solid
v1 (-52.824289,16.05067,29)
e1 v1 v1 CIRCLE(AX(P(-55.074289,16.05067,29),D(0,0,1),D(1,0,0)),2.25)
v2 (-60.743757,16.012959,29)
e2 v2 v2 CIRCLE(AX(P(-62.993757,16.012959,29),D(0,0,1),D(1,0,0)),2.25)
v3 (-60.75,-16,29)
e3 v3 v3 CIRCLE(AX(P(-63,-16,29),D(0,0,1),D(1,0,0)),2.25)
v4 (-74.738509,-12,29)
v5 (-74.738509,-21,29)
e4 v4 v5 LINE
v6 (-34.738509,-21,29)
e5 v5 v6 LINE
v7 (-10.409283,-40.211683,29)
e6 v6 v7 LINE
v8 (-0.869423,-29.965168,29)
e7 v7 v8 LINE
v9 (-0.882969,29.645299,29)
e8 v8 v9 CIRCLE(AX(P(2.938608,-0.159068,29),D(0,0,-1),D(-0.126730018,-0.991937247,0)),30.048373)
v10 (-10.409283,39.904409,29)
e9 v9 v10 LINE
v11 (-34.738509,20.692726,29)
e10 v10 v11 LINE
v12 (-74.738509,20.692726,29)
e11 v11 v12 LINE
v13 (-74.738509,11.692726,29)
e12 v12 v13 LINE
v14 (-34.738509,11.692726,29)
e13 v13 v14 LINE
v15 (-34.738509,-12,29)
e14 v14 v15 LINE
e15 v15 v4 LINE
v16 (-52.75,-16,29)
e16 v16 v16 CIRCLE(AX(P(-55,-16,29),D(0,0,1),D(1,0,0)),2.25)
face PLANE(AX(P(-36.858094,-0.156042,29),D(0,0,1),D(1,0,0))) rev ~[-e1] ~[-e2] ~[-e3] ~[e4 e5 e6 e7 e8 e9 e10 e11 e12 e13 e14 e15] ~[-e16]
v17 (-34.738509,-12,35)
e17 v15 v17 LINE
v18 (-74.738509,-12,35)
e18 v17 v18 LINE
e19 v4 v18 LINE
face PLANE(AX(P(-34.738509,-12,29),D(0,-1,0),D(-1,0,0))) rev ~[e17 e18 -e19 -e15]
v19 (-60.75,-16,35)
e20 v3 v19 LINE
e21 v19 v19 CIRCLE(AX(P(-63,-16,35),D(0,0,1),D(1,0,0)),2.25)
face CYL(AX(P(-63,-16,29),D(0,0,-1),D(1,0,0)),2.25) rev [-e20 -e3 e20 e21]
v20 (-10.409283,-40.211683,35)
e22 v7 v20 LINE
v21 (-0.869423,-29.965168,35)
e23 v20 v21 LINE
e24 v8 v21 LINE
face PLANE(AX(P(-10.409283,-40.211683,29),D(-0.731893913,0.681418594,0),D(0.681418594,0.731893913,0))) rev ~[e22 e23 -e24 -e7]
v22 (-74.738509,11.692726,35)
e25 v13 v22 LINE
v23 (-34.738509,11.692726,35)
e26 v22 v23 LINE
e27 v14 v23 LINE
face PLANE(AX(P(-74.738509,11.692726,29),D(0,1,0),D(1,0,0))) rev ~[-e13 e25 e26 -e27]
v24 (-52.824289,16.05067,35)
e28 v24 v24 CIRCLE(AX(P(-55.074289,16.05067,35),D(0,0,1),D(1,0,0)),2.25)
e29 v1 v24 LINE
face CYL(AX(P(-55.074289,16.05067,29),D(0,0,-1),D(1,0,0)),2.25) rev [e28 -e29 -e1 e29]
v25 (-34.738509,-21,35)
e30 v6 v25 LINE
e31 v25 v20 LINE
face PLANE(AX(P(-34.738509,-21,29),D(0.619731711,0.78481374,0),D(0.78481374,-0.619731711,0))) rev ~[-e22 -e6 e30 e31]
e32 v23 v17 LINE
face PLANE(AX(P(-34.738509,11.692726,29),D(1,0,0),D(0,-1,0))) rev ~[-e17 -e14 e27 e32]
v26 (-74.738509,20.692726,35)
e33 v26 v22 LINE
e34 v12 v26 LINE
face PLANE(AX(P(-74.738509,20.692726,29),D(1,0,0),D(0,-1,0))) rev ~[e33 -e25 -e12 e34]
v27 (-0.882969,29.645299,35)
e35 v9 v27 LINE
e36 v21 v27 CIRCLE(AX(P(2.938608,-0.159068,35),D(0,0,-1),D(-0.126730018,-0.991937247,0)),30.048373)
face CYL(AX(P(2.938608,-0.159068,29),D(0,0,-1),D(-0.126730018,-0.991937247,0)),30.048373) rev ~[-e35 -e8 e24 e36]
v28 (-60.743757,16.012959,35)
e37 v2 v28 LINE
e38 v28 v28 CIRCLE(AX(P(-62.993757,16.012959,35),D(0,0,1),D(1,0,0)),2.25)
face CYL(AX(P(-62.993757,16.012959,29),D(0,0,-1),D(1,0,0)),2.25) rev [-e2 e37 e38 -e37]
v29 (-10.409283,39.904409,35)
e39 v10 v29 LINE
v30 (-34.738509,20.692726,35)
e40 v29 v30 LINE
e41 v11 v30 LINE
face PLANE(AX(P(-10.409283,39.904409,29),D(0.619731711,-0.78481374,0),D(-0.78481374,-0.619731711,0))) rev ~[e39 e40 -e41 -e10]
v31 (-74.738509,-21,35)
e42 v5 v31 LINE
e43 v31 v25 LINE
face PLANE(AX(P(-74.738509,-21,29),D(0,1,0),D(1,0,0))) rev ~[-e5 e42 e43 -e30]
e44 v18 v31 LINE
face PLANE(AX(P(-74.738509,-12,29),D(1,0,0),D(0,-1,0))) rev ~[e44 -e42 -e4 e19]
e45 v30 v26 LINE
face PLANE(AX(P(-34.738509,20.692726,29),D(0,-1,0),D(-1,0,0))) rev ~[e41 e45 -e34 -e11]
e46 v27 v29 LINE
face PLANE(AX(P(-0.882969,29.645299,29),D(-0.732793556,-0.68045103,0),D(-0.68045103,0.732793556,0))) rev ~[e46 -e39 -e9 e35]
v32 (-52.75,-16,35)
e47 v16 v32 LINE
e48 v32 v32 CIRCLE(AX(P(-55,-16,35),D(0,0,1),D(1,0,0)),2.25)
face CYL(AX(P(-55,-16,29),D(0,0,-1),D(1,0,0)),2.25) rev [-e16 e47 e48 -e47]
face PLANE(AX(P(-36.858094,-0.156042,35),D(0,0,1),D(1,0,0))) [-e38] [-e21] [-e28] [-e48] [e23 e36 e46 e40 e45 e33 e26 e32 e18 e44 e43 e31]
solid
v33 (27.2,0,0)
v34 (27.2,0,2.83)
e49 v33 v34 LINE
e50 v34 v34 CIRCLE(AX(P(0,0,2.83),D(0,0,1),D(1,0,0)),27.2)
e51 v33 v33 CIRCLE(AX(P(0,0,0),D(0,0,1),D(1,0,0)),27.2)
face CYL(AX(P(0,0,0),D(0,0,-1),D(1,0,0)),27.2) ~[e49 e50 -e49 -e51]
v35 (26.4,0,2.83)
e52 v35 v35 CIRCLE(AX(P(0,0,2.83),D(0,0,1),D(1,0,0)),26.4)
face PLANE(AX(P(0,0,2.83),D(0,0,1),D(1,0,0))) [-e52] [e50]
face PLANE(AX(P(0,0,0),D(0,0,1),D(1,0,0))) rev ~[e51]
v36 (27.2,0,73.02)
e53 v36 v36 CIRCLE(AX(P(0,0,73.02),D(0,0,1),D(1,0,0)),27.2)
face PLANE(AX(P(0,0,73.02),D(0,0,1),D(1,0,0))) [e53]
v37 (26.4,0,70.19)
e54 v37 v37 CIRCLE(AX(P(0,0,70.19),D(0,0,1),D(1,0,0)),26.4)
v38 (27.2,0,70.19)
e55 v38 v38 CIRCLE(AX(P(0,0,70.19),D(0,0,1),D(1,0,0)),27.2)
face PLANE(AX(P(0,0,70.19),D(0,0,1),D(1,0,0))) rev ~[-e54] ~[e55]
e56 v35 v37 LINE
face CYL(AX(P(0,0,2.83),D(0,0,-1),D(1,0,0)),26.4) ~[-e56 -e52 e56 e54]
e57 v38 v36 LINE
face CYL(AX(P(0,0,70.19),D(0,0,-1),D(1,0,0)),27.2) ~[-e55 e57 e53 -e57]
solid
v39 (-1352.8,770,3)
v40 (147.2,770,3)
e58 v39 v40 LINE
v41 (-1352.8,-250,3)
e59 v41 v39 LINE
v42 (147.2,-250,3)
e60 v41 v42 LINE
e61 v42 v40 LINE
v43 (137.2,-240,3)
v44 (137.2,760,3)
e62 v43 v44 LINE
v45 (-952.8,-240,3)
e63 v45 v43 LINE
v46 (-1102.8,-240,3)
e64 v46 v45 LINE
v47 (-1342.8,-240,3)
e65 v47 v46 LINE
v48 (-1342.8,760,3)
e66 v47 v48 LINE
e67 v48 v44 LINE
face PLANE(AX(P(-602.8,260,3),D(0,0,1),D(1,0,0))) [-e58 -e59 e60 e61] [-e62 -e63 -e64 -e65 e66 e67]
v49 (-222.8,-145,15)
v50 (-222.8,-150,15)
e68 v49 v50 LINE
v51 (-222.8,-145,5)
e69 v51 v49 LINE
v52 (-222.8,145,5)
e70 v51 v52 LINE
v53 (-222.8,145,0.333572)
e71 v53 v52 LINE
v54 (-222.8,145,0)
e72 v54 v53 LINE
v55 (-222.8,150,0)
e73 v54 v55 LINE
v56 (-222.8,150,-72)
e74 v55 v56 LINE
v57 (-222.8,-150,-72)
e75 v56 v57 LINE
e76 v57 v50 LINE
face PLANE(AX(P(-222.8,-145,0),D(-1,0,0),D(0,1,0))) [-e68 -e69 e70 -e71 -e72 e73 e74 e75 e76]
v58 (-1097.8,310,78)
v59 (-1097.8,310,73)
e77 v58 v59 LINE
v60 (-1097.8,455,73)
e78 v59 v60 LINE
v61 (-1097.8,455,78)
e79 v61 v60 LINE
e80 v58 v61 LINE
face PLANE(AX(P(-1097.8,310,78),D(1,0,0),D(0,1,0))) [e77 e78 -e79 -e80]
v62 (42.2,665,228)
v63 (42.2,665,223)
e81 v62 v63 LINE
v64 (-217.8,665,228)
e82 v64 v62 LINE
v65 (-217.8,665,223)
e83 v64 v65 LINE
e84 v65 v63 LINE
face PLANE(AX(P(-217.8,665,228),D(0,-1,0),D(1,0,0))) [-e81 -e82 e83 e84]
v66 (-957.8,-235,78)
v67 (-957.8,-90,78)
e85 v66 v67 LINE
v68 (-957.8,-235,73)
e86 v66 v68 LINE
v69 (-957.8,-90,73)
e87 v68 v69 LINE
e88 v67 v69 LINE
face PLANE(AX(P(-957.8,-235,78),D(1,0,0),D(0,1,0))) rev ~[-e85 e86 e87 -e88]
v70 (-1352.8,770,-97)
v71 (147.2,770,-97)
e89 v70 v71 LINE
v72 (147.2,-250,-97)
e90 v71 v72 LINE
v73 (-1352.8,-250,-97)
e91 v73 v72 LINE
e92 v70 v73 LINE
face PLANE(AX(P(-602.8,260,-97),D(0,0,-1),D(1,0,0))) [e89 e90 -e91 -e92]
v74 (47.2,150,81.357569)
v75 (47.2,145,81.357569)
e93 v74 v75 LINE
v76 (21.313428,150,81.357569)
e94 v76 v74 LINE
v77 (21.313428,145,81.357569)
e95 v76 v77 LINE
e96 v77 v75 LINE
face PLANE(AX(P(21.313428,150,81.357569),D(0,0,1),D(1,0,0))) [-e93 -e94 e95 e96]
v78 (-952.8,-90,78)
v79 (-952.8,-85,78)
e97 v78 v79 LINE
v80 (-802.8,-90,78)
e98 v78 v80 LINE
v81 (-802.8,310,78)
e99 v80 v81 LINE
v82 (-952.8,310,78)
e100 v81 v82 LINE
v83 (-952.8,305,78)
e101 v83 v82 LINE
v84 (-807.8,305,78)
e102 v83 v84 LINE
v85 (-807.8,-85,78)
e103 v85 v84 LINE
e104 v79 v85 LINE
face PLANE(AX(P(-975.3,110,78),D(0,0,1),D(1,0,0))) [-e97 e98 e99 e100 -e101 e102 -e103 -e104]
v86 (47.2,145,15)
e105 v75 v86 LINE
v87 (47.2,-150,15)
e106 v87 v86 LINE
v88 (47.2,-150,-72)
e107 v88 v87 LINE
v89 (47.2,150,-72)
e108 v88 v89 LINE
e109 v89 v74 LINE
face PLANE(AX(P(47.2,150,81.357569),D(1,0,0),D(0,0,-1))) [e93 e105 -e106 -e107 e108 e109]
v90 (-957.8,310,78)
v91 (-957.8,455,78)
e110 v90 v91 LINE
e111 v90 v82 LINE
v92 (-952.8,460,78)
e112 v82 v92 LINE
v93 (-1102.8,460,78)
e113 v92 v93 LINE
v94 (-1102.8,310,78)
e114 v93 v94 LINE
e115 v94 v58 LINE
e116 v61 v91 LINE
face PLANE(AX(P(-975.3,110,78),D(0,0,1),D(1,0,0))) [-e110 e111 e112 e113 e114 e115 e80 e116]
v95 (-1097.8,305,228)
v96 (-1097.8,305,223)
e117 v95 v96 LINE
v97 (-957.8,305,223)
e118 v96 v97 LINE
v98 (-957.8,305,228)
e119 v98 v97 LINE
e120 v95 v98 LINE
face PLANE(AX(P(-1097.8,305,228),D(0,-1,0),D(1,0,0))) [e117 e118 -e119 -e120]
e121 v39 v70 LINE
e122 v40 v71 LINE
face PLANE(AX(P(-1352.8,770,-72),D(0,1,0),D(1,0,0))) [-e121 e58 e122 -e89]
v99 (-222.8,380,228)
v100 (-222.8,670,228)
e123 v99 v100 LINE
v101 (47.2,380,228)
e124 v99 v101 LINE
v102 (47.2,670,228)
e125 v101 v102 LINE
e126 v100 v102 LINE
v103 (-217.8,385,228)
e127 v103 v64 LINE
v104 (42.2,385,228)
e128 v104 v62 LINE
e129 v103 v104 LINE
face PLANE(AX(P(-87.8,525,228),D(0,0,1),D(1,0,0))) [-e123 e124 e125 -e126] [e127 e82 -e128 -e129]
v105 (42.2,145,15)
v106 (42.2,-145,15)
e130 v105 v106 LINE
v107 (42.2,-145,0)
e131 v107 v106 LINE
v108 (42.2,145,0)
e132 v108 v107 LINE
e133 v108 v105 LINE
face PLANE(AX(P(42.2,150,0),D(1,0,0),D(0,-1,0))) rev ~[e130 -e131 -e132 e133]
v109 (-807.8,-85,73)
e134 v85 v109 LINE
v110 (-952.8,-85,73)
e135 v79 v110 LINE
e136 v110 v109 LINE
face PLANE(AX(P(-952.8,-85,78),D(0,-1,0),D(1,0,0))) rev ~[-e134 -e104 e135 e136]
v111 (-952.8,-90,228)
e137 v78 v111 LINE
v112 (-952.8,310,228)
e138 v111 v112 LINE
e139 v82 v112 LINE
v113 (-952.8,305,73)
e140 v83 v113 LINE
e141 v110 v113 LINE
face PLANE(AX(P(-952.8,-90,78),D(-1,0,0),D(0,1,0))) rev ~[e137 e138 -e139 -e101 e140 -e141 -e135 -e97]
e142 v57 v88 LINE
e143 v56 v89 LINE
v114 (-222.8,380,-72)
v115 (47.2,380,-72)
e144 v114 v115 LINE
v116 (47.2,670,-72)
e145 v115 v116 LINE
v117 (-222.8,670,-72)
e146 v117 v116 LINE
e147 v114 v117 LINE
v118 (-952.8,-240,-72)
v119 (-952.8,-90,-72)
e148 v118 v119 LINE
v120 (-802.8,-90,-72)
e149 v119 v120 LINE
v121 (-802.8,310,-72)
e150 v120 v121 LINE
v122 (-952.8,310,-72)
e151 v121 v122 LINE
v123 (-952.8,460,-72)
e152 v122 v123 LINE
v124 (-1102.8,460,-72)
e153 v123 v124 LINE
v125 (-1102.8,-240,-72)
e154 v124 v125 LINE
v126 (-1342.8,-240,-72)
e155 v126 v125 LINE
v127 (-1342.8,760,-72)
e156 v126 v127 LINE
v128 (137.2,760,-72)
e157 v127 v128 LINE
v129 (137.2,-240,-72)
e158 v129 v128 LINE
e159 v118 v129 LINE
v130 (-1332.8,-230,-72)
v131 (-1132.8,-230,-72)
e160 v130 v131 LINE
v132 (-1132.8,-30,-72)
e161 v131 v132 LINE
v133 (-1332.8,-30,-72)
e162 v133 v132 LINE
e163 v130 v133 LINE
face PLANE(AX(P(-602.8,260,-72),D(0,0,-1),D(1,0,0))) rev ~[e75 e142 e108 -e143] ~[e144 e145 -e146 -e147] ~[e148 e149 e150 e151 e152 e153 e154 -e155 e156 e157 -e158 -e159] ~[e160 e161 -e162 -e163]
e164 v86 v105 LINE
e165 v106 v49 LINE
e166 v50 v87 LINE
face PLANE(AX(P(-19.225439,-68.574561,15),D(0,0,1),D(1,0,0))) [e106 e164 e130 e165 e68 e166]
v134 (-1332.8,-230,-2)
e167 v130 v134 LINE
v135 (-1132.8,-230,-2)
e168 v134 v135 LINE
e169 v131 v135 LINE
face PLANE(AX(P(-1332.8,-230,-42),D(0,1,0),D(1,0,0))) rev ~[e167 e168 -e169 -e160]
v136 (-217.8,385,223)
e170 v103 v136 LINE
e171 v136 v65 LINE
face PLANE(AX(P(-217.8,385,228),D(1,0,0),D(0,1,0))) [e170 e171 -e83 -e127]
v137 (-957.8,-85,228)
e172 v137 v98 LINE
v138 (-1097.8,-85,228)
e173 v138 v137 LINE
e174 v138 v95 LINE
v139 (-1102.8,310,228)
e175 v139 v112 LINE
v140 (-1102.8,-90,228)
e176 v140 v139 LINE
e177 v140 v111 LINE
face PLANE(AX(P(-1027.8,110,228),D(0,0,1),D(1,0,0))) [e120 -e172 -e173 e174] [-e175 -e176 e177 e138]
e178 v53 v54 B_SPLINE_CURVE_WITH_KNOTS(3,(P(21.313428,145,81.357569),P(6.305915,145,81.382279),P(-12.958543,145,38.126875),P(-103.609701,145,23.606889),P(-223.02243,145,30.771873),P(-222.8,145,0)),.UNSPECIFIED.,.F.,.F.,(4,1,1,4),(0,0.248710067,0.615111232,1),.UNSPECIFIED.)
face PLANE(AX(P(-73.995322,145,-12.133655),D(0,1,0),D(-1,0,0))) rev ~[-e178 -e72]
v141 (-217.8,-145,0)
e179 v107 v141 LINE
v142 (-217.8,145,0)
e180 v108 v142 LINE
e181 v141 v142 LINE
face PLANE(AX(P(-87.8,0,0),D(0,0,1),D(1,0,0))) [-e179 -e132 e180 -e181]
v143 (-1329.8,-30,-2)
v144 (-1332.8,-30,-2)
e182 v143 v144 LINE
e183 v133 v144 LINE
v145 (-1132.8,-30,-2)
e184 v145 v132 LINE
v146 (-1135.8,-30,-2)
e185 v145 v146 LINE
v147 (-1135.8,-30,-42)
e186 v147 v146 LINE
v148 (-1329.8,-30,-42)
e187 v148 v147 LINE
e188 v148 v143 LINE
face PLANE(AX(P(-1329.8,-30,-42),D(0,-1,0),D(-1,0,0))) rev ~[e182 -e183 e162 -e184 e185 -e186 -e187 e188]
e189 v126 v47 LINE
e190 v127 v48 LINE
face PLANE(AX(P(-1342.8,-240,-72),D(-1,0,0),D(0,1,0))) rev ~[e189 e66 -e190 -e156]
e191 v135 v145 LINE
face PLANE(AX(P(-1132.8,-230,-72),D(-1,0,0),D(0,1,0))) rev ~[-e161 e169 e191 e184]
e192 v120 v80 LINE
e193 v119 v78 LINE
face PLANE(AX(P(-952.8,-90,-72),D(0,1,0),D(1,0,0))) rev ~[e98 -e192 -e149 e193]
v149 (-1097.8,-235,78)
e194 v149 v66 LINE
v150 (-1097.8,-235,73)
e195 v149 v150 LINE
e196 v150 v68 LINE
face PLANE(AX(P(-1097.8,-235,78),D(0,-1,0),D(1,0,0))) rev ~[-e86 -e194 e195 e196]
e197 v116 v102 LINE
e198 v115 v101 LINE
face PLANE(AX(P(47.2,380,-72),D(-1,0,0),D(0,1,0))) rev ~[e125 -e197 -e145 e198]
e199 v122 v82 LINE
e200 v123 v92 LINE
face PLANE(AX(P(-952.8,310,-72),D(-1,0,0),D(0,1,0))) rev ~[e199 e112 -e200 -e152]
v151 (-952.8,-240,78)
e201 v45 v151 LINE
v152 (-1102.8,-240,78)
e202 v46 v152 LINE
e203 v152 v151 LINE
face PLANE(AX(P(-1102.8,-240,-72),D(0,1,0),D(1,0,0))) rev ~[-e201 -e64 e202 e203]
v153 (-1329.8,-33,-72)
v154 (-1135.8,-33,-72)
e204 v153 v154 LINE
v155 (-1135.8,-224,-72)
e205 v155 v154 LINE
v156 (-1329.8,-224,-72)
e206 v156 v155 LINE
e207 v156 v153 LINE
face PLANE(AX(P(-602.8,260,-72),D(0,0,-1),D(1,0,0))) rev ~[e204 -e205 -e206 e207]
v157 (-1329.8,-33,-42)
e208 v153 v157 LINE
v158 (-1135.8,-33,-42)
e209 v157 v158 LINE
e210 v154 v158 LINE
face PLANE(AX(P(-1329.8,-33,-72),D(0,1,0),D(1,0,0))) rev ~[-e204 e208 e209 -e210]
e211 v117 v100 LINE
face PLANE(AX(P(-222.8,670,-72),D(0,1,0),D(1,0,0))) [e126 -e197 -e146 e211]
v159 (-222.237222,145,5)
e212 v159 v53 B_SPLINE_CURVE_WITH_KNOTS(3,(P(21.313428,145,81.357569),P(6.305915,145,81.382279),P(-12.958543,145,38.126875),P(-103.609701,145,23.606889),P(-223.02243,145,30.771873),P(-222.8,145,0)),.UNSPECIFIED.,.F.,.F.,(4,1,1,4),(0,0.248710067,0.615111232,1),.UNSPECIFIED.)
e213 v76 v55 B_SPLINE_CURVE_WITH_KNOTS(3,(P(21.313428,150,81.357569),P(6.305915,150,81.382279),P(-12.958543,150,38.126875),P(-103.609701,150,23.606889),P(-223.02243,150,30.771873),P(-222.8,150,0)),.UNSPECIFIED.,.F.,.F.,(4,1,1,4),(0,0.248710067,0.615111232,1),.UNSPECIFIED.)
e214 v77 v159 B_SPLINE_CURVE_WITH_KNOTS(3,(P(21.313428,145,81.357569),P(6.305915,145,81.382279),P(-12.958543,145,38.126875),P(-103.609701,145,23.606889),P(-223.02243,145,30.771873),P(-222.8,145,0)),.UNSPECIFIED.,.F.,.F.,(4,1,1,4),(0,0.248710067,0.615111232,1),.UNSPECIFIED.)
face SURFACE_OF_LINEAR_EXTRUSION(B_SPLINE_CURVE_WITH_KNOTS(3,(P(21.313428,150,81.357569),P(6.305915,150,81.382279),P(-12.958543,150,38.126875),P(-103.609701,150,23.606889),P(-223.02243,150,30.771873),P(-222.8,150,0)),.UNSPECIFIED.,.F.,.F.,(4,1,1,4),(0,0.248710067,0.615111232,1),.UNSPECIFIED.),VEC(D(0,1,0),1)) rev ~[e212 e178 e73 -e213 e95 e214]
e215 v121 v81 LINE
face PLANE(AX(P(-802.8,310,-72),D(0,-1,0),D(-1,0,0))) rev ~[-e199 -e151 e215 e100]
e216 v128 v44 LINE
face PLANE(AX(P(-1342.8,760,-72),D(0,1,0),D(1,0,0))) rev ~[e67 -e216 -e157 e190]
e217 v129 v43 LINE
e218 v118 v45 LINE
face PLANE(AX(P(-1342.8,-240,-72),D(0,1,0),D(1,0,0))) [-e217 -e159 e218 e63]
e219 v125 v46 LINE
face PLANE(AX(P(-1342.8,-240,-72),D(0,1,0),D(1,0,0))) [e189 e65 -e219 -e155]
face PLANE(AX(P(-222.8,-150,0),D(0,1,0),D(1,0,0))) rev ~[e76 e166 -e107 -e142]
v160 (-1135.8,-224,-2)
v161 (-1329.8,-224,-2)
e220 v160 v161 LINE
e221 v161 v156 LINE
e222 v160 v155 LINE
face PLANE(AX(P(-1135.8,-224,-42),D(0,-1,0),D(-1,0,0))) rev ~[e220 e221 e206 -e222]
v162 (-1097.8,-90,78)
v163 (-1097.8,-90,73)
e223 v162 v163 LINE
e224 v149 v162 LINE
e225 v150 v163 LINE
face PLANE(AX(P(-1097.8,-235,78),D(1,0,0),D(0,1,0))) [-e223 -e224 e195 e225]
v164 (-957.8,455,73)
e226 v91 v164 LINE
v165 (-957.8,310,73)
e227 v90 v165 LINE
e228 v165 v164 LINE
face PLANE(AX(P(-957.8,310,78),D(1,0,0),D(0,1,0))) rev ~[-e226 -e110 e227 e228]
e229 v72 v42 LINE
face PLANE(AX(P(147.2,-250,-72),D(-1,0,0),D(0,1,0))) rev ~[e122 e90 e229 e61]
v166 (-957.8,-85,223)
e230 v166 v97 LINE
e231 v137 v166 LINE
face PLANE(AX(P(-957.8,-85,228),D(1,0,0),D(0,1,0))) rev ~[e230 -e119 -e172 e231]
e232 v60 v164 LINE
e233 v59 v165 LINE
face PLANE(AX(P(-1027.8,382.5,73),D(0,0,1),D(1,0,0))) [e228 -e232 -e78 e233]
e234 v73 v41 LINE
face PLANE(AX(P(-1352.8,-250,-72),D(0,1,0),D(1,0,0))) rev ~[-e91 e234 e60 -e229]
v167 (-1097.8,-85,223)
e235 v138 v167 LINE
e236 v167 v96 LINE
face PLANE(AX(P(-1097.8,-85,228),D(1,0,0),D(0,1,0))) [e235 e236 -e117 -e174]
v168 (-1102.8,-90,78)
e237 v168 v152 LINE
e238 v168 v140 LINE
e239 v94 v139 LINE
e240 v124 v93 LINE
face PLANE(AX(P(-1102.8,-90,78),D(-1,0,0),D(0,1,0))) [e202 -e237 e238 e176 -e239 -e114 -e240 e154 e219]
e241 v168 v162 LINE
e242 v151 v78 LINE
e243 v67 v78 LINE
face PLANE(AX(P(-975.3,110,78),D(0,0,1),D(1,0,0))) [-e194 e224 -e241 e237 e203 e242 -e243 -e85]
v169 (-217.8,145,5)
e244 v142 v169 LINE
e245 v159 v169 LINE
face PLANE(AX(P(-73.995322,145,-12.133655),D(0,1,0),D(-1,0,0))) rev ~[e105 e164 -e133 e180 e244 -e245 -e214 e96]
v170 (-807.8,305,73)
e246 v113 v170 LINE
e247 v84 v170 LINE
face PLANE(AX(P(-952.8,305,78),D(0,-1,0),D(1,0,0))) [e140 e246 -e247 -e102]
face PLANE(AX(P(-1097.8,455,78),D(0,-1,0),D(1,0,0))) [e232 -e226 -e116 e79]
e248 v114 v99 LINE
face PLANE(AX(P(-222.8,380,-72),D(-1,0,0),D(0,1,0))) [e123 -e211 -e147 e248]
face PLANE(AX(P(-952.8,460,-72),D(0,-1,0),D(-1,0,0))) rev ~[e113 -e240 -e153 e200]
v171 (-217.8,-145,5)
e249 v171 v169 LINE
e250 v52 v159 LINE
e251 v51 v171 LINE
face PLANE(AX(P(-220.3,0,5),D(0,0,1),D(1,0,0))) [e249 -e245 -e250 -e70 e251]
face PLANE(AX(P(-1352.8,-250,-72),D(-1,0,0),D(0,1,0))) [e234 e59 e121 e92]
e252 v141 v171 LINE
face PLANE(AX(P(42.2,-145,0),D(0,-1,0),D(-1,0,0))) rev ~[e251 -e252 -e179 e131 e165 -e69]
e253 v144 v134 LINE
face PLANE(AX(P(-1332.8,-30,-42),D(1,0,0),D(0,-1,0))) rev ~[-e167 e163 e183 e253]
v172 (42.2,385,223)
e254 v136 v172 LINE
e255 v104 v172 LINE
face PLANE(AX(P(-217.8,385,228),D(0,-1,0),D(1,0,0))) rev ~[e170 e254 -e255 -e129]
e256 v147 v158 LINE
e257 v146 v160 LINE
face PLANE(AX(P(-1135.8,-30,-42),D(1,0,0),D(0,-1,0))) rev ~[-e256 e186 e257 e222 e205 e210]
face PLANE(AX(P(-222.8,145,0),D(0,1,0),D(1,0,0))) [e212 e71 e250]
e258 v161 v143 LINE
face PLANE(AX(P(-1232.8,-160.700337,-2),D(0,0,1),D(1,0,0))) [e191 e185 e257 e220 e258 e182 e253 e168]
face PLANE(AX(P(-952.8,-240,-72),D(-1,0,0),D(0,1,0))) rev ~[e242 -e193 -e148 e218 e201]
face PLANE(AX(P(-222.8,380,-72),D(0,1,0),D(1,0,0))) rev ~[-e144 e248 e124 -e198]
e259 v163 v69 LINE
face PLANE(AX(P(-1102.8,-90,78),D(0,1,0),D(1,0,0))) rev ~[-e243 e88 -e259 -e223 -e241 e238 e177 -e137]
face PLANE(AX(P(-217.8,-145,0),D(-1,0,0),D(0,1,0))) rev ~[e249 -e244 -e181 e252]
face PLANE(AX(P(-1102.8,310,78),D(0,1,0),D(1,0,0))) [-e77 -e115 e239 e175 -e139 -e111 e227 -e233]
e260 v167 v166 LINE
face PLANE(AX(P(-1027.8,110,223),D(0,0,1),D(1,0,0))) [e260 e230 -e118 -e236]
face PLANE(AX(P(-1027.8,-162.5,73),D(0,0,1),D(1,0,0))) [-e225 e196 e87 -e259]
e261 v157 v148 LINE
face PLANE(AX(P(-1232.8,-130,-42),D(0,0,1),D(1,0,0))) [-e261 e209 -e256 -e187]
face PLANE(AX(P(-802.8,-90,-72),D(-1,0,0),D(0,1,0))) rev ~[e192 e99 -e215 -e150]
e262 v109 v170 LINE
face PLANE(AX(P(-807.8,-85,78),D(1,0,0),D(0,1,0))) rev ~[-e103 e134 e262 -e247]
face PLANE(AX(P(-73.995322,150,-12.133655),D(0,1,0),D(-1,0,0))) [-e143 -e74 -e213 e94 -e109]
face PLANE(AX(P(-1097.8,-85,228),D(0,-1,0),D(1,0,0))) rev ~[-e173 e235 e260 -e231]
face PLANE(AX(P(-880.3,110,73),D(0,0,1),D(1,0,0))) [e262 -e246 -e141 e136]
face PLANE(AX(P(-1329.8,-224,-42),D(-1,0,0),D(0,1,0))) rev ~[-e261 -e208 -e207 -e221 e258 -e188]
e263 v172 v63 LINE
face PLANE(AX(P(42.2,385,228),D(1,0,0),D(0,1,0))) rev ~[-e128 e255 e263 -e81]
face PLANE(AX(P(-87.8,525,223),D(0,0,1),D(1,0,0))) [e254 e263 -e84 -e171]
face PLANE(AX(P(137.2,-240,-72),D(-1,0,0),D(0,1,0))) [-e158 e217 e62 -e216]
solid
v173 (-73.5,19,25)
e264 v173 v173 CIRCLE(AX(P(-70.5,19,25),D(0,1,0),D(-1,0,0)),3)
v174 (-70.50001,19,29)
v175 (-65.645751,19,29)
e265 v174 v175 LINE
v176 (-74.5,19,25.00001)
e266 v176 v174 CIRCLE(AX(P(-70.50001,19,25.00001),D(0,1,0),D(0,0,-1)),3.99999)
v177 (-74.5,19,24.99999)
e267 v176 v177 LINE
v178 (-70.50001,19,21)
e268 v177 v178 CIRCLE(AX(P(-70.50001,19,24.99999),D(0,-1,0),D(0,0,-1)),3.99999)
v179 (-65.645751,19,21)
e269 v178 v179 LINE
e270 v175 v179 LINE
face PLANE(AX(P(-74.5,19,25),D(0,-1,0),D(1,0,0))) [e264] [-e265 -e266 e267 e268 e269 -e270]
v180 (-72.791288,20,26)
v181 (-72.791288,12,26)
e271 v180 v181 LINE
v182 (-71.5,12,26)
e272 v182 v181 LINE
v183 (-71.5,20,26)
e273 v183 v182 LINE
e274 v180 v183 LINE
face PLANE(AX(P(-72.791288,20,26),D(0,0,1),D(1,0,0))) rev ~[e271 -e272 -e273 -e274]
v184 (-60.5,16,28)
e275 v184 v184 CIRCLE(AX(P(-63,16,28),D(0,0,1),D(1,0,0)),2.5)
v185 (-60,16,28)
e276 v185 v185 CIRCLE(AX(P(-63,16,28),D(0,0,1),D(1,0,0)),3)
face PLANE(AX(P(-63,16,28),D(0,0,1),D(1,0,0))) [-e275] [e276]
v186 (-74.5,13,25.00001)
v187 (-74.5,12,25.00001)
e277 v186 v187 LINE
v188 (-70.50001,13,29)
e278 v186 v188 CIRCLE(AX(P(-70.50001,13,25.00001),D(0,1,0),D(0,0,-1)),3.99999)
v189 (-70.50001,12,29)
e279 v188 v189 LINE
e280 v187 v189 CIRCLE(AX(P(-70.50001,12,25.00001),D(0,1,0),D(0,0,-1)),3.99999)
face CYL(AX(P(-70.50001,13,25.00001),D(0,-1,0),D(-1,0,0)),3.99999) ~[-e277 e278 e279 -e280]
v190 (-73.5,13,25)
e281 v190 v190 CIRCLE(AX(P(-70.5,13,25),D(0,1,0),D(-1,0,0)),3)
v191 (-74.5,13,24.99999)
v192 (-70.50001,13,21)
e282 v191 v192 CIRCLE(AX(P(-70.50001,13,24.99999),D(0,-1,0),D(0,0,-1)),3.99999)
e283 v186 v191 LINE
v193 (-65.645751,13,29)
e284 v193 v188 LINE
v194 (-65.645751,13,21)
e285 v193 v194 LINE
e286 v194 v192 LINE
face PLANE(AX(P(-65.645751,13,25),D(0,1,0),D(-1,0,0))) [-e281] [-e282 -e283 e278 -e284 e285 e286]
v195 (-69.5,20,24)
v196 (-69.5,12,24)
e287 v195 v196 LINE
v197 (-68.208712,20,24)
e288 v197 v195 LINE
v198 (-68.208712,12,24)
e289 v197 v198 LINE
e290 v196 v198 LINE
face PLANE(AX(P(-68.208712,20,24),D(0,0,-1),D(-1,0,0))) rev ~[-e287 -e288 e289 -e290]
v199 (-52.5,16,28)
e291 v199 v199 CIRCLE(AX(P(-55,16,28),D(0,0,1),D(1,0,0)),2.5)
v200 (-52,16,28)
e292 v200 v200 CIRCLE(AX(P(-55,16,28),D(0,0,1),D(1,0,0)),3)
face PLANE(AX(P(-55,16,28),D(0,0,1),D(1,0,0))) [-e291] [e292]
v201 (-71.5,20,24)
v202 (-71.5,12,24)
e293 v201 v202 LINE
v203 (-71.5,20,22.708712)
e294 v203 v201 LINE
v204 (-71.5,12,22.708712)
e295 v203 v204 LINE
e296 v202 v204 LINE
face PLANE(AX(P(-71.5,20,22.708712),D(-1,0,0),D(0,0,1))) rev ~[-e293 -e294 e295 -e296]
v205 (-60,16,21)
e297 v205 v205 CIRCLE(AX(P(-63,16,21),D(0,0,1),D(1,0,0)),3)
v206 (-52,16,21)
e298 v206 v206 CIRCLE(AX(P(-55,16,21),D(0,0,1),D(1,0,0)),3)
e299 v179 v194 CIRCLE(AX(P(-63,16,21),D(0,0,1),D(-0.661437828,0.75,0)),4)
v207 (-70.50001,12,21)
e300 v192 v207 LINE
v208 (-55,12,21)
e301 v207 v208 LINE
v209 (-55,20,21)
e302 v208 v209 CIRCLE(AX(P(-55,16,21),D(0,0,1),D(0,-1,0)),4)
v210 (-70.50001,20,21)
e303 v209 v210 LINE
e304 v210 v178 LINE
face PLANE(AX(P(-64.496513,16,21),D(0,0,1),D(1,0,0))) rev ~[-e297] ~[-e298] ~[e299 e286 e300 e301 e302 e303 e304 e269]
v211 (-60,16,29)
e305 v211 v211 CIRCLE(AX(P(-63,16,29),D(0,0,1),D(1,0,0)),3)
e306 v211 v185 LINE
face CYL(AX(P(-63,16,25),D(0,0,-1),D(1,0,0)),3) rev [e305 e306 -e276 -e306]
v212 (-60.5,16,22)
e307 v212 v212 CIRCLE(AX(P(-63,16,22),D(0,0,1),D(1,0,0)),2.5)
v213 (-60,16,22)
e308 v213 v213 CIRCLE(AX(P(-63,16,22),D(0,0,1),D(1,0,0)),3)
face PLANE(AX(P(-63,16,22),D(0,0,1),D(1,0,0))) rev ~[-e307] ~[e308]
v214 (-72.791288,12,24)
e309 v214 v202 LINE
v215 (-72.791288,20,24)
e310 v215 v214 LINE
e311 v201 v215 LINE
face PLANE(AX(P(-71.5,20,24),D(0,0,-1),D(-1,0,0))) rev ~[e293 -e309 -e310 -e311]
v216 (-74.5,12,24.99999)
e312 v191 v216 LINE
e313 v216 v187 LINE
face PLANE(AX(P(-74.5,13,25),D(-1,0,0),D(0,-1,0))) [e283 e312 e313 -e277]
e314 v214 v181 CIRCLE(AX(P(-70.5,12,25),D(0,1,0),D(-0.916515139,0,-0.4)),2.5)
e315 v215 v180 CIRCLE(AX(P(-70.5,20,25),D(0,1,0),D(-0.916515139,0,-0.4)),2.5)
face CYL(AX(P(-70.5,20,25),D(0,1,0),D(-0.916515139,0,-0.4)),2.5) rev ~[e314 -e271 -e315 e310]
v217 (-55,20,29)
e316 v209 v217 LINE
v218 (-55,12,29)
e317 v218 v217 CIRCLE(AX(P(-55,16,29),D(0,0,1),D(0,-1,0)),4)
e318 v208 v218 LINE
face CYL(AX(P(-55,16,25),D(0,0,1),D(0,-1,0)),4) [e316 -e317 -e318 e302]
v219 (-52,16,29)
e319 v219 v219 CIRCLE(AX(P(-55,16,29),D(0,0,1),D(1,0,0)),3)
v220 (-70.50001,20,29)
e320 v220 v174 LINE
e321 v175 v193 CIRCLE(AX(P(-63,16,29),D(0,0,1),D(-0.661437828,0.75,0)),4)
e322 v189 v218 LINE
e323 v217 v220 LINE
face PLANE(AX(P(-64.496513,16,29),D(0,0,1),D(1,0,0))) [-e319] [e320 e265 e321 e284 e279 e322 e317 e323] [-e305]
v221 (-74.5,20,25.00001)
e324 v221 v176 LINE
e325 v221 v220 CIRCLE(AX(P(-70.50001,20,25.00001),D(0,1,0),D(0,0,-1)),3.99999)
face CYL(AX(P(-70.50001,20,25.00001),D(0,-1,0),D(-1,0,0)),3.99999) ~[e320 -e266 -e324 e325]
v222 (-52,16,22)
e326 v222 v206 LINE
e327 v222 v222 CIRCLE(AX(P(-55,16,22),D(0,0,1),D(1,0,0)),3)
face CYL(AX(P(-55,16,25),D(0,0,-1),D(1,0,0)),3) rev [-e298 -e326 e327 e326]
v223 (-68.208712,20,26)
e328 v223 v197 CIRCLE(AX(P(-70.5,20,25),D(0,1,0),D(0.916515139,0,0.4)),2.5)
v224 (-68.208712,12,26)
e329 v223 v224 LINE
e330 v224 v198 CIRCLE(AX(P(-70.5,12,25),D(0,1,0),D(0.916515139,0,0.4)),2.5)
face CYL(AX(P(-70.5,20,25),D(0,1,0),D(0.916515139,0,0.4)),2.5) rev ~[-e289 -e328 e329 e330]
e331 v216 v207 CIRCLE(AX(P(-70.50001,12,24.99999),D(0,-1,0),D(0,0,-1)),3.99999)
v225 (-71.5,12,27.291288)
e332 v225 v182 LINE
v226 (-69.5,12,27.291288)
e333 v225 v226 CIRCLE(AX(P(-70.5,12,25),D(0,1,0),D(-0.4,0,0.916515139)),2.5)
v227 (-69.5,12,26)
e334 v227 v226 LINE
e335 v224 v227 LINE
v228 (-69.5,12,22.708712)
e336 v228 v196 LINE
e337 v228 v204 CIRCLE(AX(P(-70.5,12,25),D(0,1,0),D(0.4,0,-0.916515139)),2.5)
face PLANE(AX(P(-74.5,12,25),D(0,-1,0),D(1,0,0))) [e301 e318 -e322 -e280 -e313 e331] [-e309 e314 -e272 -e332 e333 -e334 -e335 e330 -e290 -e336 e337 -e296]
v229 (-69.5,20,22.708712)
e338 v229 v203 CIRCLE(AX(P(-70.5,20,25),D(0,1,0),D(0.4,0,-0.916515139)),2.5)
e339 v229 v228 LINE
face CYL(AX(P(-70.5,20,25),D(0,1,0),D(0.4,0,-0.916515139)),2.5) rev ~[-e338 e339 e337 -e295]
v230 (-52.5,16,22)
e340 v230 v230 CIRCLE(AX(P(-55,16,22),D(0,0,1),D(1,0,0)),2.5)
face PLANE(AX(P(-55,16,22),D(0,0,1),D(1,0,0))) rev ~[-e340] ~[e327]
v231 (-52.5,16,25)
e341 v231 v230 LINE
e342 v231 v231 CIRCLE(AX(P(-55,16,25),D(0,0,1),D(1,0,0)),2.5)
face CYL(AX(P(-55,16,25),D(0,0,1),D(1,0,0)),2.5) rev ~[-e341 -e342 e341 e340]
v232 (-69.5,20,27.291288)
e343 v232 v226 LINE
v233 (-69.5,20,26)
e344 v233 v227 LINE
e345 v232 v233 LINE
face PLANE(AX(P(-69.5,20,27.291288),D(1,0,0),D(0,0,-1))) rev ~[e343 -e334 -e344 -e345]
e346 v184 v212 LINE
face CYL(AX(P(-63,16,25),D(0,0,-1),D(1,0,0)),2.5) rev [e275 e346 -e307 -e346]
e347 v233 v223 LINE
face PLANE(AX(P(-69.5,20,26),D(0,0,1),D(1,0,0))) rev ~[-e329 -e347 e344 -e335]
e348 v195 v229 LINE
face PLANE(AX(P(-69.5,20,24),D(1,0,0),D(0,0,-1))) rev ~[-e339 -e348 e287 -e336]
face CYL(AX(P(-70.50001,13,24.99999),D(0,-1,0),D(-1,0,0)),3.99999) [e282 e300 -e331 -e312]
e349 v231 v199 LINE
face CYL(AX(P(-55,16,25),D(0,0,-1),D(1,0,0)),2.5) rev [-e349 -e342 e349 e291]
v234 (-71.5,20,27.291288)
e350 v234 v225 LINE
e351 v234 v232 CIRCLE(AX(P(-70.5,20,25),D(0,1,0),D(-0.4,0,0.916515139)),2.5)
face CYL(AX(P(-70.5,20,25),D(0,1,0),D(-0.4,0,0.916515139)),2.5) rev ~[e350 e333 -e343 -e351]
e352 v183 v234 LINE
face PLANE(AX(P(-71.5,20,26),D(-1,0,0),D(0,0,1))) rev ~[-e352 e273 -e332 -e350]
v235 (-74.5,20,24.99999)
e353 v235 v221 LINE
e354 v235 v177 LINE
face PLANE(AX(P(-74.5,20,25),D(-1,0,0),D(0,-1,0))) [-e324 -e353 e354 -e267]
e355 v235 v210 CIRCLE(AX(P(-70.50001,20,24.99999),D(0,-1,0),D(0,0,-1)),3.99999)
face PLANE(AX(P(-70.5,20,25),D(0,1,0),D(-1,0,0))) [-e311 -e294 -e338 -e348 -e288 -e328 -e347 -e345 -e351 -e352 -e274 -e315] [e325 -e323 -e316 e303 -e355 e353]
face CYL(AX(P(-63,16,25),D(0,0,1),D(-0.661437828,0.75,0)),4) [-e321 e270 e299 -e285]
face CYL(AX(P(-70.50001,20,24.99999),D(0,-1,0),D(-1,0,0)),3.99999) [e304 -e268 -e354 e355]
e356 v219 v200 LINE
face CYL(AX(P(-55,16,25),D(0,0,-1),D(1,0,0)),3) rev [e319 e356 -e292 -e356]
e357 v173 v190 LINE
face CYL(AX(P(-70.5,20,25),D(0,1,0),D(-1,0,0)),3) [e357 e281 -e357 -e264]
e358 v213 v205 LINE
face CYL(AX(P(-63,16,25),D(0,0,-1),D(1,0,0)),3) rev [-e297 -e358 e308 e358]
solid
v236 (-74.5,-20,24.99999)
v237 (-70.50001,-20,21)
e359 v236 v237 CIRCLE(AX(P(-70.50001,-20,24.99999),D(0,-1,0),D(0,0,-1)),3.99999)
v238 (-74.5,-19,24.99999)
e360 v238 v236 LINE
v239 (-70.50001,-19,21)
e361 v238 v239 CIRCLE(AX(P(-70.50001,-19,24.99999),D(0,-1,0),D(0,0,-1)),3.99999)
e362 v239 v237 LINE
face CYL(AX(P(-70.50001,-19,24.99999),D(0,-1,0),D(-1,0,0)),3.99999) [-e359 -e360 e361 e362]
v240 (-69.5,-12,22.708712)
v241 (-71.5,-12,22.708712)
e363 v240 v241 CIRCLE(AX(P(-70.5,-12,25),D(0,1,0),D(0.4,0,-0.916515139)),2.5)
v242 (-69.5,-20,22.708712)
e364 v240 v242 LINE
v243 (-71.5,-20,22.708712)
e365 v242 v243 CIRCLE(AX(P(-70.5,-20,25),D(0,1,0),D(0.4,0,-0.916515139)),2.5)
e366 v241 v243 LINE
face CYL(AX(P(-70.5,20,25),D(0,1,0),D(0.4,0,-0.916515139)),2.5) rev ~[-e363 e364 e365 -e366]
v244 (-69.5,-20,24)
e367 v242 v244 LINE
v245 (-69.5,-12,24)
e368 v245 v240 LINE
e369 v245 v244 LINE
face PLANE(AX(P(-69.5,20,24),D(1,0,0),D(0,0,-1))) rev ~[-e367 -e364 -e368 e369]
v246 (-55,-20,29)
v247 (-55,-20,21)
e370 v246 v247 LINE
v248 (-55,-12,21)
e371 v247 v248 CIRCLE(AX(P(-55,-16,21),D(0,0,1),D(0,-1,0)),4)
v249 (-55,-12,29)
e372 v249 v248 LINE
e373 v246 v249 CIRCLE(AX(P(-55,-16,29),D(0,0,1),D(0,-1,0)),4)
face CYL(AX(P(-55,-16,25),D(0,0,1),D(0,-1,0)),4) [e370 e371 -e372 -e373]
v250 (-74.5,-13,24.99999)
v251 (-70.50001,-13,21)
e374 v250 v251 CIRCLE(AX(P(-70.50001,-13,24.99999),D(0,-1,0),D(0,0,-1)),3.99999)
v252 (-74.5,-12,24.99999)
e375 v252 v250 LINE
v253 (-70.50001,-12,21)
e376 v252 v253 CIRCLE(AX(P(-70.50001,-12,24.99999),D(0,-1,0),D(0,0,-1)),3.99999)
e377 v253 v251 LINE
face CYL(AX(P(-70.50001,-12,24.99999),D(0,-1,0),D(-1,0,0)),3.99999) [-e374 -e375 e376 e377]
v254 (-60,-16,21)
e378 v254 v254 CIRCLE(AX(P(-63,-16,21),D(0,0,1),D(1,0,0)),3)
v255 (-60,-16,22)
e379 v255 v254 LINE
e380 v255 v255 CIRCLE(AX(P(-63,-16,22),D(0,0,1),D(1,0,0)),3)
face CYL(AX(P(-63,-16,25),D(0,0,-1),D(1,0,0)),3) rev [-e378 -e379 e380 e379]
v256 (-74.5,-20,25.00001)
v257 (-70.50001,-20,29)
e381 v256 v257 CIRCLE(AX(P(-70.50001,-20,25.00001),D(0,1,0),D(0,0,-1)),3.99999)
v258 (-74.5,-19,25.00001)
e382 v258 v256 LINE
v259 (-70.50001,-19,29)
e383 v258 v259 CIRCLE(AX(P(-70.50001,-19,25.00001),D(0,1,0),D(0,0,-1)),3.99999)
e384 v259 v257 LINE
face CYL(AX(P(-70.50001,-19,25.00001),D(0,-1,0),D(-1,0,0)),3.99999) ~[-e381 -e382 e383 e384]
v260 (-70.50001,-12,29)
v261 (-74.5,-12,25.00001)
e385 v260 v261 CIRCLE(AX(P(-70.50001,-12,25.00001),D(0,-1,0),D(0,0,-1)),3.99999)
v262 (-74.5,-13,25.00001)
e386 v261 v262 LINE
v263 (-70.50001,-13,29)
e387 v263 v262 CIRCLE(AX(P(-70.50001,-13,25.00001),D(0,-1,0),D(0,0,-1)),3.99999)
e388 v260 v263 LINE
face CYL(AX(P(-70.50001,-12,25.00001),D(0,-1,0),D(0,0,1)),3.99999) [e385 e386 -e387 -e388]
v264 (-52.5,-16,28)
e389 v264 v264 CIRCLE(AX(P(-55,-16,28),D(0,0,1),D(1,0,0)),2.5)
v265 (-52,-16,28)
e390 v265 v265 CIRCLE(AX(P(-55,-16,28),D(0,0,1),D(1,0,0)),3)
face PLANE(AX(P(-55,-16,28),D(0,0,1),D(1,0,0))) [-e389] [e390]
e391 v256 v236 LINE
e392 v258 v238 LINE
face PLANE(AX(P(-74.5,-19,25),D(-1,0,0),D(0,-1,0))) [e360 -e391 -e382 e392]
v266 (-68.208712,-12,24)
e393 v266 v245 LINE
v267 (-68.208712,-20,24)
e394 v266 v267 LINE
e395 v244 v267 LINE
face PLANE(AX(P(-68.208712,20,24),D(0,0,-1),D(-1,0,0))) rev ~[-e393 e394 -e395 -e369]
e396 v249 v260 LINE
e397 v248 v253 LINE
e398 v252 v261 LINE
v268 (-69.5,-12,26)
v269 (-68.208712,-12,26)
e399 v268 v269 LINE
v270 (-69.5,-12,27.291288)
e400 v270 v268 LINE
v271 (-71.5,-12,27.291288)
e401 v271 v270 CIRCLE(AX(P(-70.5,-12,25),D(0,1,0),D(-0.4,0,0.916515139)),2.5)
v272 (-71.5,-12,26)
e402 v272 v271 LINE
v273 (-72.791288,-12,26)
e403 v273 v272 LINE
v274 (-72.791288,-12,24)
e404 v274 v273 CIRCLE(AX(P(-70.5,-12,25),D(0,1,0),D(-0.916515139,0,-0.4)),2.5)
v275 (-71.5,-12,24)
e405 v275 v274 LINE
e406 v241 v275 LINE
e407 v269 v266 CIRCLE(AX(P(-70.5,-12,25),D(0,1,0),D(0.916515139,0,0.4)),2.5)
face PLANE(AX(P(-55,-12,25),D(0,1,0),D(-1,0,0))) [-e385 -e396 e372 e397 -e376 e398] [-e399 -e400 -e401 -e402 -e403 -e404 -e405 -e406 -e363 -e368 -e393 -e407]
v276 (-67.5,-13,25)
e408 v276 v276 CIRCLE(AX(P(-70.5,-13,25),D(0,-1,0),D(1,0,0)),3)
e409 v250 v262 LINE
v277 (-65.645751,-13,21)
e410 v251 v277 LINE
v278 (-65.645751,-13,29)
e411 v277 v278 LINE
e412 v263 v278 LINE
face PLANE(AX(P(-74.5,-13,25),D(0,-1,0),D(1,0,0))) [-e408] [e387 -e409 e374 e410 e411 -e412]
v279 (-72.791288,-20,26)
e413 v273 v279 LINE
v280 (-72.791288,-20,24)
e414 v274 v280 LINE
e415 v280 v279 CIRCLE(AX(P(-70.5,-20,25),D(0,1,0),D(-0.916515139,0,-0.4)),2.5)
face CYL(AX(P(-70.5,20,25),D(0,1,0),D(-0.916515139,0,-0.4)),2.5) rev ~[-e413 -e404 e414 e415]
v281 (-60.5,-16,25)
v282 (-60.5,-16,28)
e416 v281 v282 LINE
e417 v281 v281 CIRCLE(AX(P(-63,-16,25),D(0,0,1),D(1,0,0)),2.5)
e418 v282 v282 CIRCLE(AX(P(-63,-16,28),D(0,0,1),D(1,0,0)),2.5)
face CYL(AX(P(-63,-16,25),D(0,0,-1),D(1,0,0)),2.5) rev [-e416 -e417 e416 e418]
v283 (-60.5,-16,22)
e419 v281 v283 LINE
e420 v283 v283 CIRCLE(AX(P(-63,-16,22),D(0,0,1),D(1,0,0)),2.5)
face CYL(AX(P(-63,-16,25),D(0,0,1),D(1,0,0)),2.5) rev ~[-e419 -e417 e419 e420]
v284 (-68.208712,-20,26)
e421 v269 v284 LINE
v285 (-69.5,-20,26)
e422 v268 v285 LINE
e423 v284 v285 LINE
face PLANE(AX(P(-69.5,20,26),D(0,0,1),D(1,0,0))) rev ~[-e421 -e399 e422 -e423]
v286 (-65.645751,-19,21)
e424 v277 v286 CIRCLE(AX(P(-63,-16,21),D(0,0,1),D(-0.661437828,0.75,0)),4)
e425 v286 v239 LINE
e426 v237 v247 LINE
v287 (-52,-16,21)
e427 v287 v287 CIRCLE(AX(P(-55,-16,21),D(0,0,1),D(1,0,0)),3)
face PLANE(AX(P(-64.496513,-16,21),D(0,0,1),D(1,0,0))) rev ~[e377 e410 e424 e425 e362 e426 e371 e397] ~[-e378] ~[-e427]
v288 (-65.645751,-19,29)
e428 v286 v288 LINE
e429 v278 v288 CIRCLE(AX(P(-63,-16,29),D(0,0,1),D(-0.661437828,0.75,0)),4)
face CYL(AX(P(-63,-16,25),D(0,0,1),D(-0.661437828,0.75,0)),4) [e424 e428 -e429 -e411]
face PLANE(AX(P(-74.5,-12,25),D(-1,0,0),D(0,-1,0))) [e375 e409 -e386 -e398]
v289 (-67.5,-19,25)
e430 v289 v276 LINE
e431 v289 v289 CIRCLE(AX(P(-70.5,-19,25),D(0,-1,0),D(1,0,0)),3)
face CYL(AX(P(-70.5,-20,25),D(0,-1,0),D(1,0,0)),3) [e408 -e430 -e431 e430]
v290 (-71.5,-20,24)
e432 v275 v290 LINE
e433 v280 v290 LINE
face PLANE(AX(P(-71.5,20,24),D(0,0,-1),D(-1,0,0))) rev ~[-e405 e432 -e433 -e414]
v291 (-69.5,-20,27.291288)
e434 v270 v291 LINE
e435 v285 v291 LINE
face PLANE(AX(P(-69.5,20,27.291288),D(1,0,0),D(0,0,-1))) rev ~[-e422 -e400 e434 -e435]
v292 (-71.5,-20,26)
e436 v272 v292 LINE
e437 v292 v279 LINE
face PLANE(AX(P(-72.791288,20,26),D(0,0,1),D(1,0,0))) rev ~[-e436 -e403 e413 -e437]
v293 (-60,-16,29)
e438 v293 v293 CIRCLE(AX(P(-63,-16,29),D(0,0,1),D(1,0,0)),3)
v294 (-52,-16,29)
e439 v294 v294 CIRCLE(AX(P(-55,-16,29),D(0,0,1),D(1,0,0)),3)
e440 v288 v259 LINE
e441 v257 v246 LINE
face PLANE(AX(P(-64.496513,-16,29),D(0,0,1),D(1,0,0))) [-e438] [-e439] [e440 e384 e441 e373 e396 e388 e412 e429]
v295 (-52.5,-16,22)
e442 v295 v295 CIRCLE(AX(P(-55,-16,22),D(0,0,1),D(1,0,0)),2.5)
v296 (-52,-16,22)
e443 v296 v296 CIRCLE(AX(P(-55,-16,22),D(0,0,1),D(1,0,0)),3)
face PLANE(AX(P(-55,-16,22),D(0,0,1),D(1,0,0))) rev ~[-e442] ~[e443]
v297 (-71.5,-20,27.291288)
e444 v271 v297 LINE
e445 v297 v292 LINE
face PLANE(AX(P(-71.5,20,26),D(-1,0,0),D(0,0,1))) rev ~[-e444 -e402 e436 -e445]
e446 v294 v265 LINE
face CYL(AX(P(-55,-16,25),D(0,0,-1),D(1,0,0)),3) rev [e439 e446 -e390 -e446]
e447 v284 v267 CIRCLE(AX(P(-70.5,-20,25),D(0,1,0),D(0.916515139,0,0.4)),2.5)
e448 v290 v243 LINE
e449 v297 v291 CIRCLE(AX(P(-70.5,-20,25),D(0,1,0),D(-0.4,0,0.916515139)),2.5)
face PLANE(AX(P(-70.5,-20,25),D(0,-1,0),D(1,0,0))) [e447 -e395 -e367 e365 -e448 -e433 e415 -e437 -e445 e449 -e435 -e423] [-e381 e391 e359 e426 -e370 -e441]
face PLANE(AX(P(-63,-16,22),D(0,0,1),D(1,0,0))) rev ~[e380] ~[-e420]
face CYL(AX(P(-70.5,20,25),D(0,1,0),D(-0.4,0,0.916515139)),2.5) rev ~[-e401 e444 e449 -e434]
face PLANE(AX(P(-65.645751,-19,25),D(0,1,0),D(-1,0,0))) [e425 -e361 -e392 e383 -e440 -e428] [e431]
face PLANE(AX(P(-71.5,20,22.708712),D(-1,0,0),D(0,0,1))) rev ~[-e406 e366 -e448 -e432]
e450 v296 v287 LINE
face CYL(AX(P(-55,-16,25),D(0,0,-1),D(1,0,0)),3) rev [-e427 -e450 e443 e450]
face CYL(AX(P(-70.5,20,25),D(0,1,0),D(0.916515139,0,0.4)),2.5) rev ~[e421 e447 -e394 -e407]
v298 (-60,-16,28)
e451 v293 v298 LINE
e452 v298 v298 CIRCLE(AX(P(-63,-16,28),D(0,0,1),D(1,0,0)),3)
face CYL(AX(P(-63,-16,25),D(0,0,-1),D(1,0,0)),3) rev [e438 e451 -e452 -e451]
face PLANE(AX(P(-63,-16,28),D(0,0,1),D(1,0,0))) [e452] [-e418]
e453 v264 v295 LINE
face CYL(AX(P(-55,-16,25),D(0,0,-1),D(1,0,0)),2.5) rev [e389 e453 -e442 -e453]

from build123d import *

# Parameters (mm, degrees)
F0_R      = 27.2
F1_DEPTH  = 2.83
F2_R      = 26.4
F3_DEPTH  = 67.36
F4_R      = 27.2
F5_DEPTH  = 2.83
F9_W      = 270
F9_H      = 300
F10_DEPTH = 72
F12_DEPTH = 15
F14_DEPTH = 5
F15_W     = 5
F15_H     = 290
F16_DEPTH = 5
F17_W     = 1500
F17_H     = 1020
F18_DEPTH = 25
F19_W     = 270
F19_H     = 290
F20_DEPTH = 300
F21_W     = 260
F21_H     = 280
F22_DEPTH = 5
F23_W     = 1500
F23_H     = 1020
F23_W_2   = 1480
F23_H_2   = 1000
F24_DEPTH = 75
F26_DEPTH = 150
F27_W     = 150
F27_H     = 400
F28_DEPTH = 150
F29_W     = 140
F29_H     = 390
F30_DEPTH = 5
F31_W     = 140
F31_H     = 145
F31_W_2   = 145
F31_H_2   = 390
F32_DEPTH = 5
F33_R     = 3
F34_DEPTH = 4
F35_R     = 3.99999
F35_2_R   = 3.99999
F36_R     = 3
F37_DEPTH = 8
F38_R     = 3
F39_DEPTH = 8
F40_R     = 3
F40_R_2   = 2.5
F41_DEPTH = 3
F42_R     = 3
F42_R_2   = 2.5
F43_DEPTH = 3
F45_DEPTH = 270.001
F46_W     = 200
F46_H     = 200
F46_W_2   = 194
F46_H_2   = 191
F47_DEPTH = 30
F49_DEPTH = 40
F50_R     = 2.25
F51_DEPTH = 6


# Not quite as in the source:
# - a fillet or chamfer is up to 0.001 mm smaller than in the source, because OpenCascade refuses the exact size
# - a feature names something its author has since deleted; it is built from what else it names


with BuildPart() as f1:
    # F0 (on Top) → F1 (new body)
    with BuildSketch(Plane.XY):
        Circle(F0_R)
    extrude(amount=F1_DEPTH)

    # F2 (on face) → F3 (join)
    with BuildSketch(Plane.XY.offset(2.83)):
        Circle(F2_R)
    extrude(amount=F3_DEPTH)

    # F4 (on face) → F5 (join)
    with BuildSketch(Plane.XY.offset(70.19)):
        Circle(F4_R)
    extrude(amount=F5_DEPTH)


with BuildPart() as f10:
    # F9 (on Top) → F10 (new body)
    with BuildSketch(Plane.XY):
        with Locations((-87.8, 0)):
            Rectangle(F9_W, F9_H)
    extrude(amount=-F10_DEPTH)

    # F11 (on face) → F12 (join)
    with BuildSketch(Plane.XY):
        Polygon((-222.8, -145), (-222.8, -150), (47.2, -150), (47.2, 150), (42.2, 150), (42.2, -145), align=None)
    extrude(amount=F12_DEPTH)

    # F13 (on face) → F14 (join)
    with BuildSketch(Plane(origin=(0, 150, 0), x_dir=(-1, 0, 0), z_dir=(0, 1, 0))):
        with BuildLine():
            Line((-21.3134280931, 81.3575685024), (-47.2, 81.3575685024))
            Line((-47.2, 81.3575685024), (-47.2, -72))
            Line((-47.2, -72), (222.8, -72))
            Line((222.8, -72), (222.8, 0))
            add(Edge.make_bspline(
                [(-21.3134280931, 81.3575685024), (-6.3059147253, 81.3822787863), (12.9585432644, 38.1268753575), (103.6097013063, 23.6068887567), (223.0224295336, 30.7718731823), (222.8, 0)],
                knots=[0, 0, 0, 0, 0.2487100673, 0.6151112321, 1, 1, 1, 1], degree=3))
        make_face()
    extrude(amount=-F14_DEPTH)

    # F15 (on face) → F16 (join)
    with BuildSketch(Plane.XY):
        with Locations((-220.3, 0)):
            Rectangle(F15_W, F15_H)
    extrude(amount=F16_DEPTH)

    # F17 (on face) → F18 (join)
    with BuildSketch(Plane(origin=(0, 0, -72), x_dir=(1, 0, 0), z_dir=(0, 0, -1))):
        with Locations((-602.8, -260)):
            Rectangle(F17_W, F17_H)
    extrude(amount=F18_DEPTH)

    # F19 (on face) → F20 (join)
    with BuildSketch(Plane.XY.offset(-72)):
        with Locations((-87.8, 525)):
            Rectangle(F19_W, F19_H)
    extrude(amount=F20_DEPTH)

    # F21 (on face) → F22 (cut)
    with BuildSketch(Plane.XY.offset(228)):
        with Locations((-87.8, 525)):
            Rectangle(F21_W, F21_H)
    extrude(amount=-F22_DEPTH, mode=Mode.SUBTRACT)

    # F23 (on face) → F24 (join)
    with BuildSketch(Plane.XY.offset(-72)):
        with Locations((-602.8, 260)):
            Rectangle(F23_W, F23_H)
        with Locations((-602.8, 260)):
            Rectangle(F23_W_2, F23_H_2, mode=Mode.SUBTRACT)
    extrude(amount=F24_DEPTH)

    # F25 (on face) → F26 (join)
    with BuildSketch(Plane.XY.offset(-72)):
        Polygon((-952.8, 460), (-1102.8, 460), (-1102.8, -240), (-952.8, -240), (-952.8, -90), (-802.8, -90), (-802.8, 310), (-952.8, 310), align=None)
    extrude(amount=F26_DEPTH)

    # F27 (on face) → F28 (join)
    with BuildSketch(Plane.XY.offset(78)):
        with Locations((-1027.8, 110)):
            Rectangle(F27_W, F27_H)
    extrude(amount=F28_DEPTH)

    # F29 (on face) → F30 (cut)
    with BuildSketch(Plane.XY.offset(228)):
        with Locations((-1027.8, 110)):
            Rectangle(F29_W, F29_H)
    extrude(amount=-F30_DEPTH, mode=Mode.SUBTRACT)

    # F31 (on face) → F32 (cut)
    with BuildSketch(Plane.XY.offset(78)):
        with Locations((-1027.8, 382.5)):
            Rectangle(F31_W, F31_H)
        with Locations((-880.3, 110)):
            Rectangle(F31_W_2, F31_H_2)
        with Locations((-1027.8, -162.5)):
            Rectangle(F31_W, F31_H)
    extrude(amount=-F32_DEPTH, mode=Mode.SUBTRACT)

    # F46 (on face) → F47 (join)
    with BuildSketch(Plane.XY.offset(-72)):
        with Locations((-1232.8, -130)):
            Rectangle(F46_W, F46_H)
        with Locations((-1232.8, -128.5)):
            Rectangle(F46_W_2, F46_H_2, mode=Mode.SUBTRACT)
    extrude(amount=F47_DEPTH)

    # F48 (on face) → F49 (join)
    with BuildSketch(Plane.XY.offset(-42)):
        Polygon((-1329.8, -30), (-1332.8, -30), (-1332.8, -230), (-1329.8, -230), (-1135.8, -230), (-1132.8, -230), (-1132.8, -30), (-1135.8, -30), (-1135.8, -224), (-1329.8, -224), align=None)
    extrude(amount=F49_DEPTH)


with BuildPart() as f34:
    # F33 (on offset) → F34 (new body, symmetric)
    with BuildSketch(Plane.XY.offset(25)):
        with BuildLine():
            Line((-55, -12), (-74.5, -12))
            Line((-74.5, -12), (-74.5, -13))
            Line((-74.5, -13), (-65.6457513111, -13))
            ThreePointArc((-65.6457513111, -13), (-67, -16), (-65.6457513111, -19))
            Line((-65.6457513111, -19), (-74.5, -19))
            Line((-74.5, -19), (-74.5, -20))
            Line((-74.5, -20), (-55, -20))
            ThreePointArc((-55, -20), (-51, -16), (-55, -12))
        make_face()
        with Locations((-63, -16)):
            Circle(F33_R, mode=Mode.SUBTRACT)
        with Locations((-55, -16)):
            Circle(F33_R, mode=Mode.SUBTRACT)
    extrude(amount=F34_DEPTH, both=True)

    # F35 (radius 4 in the source; OpenCascade refuses exactly that, so slightly less here)
    f35_edges = [f34.edges().sort_by_distance(p)[0] for p in [
        (-74.5, -19.5, 29),
        (-74.5, -12.5, 29),
        (-74.5, -19.5, 21),
        (-74.5, -12.5, 21),
    ]]
    fillet(f35_edges, radius=F35_R)

    # F36 (on face) → F37 (join, through all)
    with BuildSketch(Plane.XZ.offset(20)):
        with Locations((-70.5, 25)):
            Circle(F36_R)
    extrude(amount=-F37_DEPTH)

    # F42 (on offset) → F43 (join, symmetric)
    with BuildSketch(Plane.XY.offset(25)):
        with Locations((-63, -16)):
            Circle(F42_R)
        with Locations((-63, -16)):
            Circle(F42_R_2, mode=Mode.SUBTRACT)
        with Locations((-55, -16)):
            Circle(F42_R)
        with Locations((-55, -16)):
            Circle(F42_R_2, mode=Mode.SUBTRACT)
    extrude(amount=F43_DEPTH, both=True)


with BuildPart() as f34b:
    # F33 (on offset) → F34, piece 2 (new body, symmetric)
    with BuildSketch(Plane.XY.offset(25)):
        with BuildLine():
            Line((-74.5, 13), (-74.5, 12))
            Line((-74.5, 12), (-55, 12))
            ThreePointArc((-55, 12), (-51, 16), (-55, 20))
            Line((-55, 20), (-74.5, 20))
            Line((-74.5, 20), (-74.5, 19))
            Line((-74.5, 19), (-65.6457513111, 19))
            ThreePointArc((-65.6457513111, 19), (-67, 16), (-65.6457513111, 13))
            Line((-65.6457513111, 13), (-74.5, 13))
        make_face()
        with Locations((-63, 16)):
            Circle(F33_R, mode=Mode.SUBTRACT)
        with Locations((-55, 16)):
            Circle(F33_R, mode=Mode.SUBTRACT)
    extrude(amount=F34_DEPTH, both=True)

    # F35#2 (radius 4 in the source; OpenCascade refuses exactly that, so slightly less here)
    f35_2_edges = [f34b.edges().sort_by_distance(p)[0] for p in [
        (-74.5, 12.5, 29),
        (-74.5, 19.5, 29),
        (-74.5, 19.5, 21),
        (-74.5, 12.5, 21),
    ]]
    fillet(f35_2_edges, radius=F35_2_R)

    # F38 (on face) → F39 (join, through all)
    with BuildSketch(Plane(origin=(0, 20, 0), x_dir=(-1, 0, 0), z_dir=(0, 1, 0))):
        with Locations((70.5, 25)):
            Circle(F38_R)
    extrude(amount=-F39_DEPTH)

    # F40 (on offset) → F41 (join, symmetric)
    with BuildSketch(Plane.XY.offset(25)):
        with Locations((-55, 16)):
            Circle(F40_R)
        with Locations((-55, 16)):
            Circle(F40_R_2, mode=Mode.SUBTRACT)
        with Locations((-63, 16)):
            Circle(F40_R)
        with Locations((-63, 16)):
            Circle(F40_R_2, mode=Mode.SUBTRACT)
    extrude(amount=F41_DEPTH, both=True)


with BuildPart() as f45_tool:
    # F44 (on face) → F45 (new body, through all)
    with BuildSketch(Plane(origin=(0, 20, 0), x_dir=(-1, 0, 0), z_dir=(0, 1, 0))):
        with BuildLine():
            Line((71.5, 26), (71.5, 27.2912878475))
            ThreePointArc((71.5, 27.2912878475), (70.5, 27.5), (69.5, 27.2912878475))
            Line((69.5, 27.2912878475), (69.5, 26))
            Line((69.5, 26), (68.2087121525, 26))
            ThreePointArc((68.2087121525, 26), (68, 25), (68.2087121525, 24))
            Line((68.2087121525, 24), (69.5, 24))
            Line((69.5, 24), (69.5, 22.7087121525))
            ThreePointArc((69.5, 22.7087121525), (70.5, 22.5), (71.5, 22.7087121525))
            Line((71.5, 22.7087121525), (71.5, 24))
            Line((71.5, 24), (72.7912878475, 24))
            ThreePointArc((72.7912878475, 24), (73, 25), (72.7912878475, 26))
            Line((72.7912878475, 26), (71.5, 26))
        make_face()
    extrude(amount=-F45_DEPTH)


with BuildPart() as f34_1:
    add(f34.part)

    # F45: cut by f45_tool
    add(f45_tool.part, mode=Mode.SUBTRACT)


with BuildPart() as f34b_1:
    add(f34b.part)

    # F45: cut by f45_tool
    add(f45_tool.part, mode=Mode.SUBTRACT)


with BuildPart() as f51:
    # F50 (on face) → F51 (new body)
    with BuildSketch(Plane.XY.offset(29)):
        with BuildLine():
            ThreePointArc((-0.8694231288, -29.9651682592), (-27.1097646961, -0.16589585), (-0.8829690239, 29.6452992025))
            Line((-0.8829690239, 29.6452992025), (-10.4092834421, 39.9044089887))
            Line((-10.4092834421, 39.9044089887), (-34.7385093788, 20.6927259462))
            Line((-34.7385093788, 20.6927259462), (-74.7385093788, 20.6927259462))
            Line((-74.7385093788, 20.6927259462), (-74.7385093788, 11.6927259462))
            Line((-74.7385093788, 11.6927259462), (-34.7385093788, 11.6927259462))
            Line((-34.7385093788, 11.6927259462), (-34.7385093788, -12))
            Line((-34.7385093788, -12), (-74.7385093788, -12))
            Line((-74.7385093788, -12), (-74.7385093788, -21))
            Line((-74.7385093788, -21), (-34.7385093788, -21))
            Line((-34.7385093788, -21), (-10.4092834421, -40.2116830424))
            Line((-10.4092834421, -40.2116830424), (-0.8694231288, -29.9651682592))
        make_face()
        with Locations((-63, -16)):
            Circle(F50_R, mode=Mode.SUBTRACT)
        with Locations((-55, -16)):
            Circle(F50_R, mode=Mode.SUBTRACT)
        with Locations((-62.9937574267, 16.0129591823)):
            Circle(F50_R, mode=Mode.SUBTRACT)
        with Locations((-55.0742894411, 16.050670296)):
            Circle(F50_R, mode=Mode.SUBTRACT)
    extrude(amount=F51_DEPTH)


solid = Compound([f1.part, f10.part, f34_1.part, f34b_1.part, f51.part])
